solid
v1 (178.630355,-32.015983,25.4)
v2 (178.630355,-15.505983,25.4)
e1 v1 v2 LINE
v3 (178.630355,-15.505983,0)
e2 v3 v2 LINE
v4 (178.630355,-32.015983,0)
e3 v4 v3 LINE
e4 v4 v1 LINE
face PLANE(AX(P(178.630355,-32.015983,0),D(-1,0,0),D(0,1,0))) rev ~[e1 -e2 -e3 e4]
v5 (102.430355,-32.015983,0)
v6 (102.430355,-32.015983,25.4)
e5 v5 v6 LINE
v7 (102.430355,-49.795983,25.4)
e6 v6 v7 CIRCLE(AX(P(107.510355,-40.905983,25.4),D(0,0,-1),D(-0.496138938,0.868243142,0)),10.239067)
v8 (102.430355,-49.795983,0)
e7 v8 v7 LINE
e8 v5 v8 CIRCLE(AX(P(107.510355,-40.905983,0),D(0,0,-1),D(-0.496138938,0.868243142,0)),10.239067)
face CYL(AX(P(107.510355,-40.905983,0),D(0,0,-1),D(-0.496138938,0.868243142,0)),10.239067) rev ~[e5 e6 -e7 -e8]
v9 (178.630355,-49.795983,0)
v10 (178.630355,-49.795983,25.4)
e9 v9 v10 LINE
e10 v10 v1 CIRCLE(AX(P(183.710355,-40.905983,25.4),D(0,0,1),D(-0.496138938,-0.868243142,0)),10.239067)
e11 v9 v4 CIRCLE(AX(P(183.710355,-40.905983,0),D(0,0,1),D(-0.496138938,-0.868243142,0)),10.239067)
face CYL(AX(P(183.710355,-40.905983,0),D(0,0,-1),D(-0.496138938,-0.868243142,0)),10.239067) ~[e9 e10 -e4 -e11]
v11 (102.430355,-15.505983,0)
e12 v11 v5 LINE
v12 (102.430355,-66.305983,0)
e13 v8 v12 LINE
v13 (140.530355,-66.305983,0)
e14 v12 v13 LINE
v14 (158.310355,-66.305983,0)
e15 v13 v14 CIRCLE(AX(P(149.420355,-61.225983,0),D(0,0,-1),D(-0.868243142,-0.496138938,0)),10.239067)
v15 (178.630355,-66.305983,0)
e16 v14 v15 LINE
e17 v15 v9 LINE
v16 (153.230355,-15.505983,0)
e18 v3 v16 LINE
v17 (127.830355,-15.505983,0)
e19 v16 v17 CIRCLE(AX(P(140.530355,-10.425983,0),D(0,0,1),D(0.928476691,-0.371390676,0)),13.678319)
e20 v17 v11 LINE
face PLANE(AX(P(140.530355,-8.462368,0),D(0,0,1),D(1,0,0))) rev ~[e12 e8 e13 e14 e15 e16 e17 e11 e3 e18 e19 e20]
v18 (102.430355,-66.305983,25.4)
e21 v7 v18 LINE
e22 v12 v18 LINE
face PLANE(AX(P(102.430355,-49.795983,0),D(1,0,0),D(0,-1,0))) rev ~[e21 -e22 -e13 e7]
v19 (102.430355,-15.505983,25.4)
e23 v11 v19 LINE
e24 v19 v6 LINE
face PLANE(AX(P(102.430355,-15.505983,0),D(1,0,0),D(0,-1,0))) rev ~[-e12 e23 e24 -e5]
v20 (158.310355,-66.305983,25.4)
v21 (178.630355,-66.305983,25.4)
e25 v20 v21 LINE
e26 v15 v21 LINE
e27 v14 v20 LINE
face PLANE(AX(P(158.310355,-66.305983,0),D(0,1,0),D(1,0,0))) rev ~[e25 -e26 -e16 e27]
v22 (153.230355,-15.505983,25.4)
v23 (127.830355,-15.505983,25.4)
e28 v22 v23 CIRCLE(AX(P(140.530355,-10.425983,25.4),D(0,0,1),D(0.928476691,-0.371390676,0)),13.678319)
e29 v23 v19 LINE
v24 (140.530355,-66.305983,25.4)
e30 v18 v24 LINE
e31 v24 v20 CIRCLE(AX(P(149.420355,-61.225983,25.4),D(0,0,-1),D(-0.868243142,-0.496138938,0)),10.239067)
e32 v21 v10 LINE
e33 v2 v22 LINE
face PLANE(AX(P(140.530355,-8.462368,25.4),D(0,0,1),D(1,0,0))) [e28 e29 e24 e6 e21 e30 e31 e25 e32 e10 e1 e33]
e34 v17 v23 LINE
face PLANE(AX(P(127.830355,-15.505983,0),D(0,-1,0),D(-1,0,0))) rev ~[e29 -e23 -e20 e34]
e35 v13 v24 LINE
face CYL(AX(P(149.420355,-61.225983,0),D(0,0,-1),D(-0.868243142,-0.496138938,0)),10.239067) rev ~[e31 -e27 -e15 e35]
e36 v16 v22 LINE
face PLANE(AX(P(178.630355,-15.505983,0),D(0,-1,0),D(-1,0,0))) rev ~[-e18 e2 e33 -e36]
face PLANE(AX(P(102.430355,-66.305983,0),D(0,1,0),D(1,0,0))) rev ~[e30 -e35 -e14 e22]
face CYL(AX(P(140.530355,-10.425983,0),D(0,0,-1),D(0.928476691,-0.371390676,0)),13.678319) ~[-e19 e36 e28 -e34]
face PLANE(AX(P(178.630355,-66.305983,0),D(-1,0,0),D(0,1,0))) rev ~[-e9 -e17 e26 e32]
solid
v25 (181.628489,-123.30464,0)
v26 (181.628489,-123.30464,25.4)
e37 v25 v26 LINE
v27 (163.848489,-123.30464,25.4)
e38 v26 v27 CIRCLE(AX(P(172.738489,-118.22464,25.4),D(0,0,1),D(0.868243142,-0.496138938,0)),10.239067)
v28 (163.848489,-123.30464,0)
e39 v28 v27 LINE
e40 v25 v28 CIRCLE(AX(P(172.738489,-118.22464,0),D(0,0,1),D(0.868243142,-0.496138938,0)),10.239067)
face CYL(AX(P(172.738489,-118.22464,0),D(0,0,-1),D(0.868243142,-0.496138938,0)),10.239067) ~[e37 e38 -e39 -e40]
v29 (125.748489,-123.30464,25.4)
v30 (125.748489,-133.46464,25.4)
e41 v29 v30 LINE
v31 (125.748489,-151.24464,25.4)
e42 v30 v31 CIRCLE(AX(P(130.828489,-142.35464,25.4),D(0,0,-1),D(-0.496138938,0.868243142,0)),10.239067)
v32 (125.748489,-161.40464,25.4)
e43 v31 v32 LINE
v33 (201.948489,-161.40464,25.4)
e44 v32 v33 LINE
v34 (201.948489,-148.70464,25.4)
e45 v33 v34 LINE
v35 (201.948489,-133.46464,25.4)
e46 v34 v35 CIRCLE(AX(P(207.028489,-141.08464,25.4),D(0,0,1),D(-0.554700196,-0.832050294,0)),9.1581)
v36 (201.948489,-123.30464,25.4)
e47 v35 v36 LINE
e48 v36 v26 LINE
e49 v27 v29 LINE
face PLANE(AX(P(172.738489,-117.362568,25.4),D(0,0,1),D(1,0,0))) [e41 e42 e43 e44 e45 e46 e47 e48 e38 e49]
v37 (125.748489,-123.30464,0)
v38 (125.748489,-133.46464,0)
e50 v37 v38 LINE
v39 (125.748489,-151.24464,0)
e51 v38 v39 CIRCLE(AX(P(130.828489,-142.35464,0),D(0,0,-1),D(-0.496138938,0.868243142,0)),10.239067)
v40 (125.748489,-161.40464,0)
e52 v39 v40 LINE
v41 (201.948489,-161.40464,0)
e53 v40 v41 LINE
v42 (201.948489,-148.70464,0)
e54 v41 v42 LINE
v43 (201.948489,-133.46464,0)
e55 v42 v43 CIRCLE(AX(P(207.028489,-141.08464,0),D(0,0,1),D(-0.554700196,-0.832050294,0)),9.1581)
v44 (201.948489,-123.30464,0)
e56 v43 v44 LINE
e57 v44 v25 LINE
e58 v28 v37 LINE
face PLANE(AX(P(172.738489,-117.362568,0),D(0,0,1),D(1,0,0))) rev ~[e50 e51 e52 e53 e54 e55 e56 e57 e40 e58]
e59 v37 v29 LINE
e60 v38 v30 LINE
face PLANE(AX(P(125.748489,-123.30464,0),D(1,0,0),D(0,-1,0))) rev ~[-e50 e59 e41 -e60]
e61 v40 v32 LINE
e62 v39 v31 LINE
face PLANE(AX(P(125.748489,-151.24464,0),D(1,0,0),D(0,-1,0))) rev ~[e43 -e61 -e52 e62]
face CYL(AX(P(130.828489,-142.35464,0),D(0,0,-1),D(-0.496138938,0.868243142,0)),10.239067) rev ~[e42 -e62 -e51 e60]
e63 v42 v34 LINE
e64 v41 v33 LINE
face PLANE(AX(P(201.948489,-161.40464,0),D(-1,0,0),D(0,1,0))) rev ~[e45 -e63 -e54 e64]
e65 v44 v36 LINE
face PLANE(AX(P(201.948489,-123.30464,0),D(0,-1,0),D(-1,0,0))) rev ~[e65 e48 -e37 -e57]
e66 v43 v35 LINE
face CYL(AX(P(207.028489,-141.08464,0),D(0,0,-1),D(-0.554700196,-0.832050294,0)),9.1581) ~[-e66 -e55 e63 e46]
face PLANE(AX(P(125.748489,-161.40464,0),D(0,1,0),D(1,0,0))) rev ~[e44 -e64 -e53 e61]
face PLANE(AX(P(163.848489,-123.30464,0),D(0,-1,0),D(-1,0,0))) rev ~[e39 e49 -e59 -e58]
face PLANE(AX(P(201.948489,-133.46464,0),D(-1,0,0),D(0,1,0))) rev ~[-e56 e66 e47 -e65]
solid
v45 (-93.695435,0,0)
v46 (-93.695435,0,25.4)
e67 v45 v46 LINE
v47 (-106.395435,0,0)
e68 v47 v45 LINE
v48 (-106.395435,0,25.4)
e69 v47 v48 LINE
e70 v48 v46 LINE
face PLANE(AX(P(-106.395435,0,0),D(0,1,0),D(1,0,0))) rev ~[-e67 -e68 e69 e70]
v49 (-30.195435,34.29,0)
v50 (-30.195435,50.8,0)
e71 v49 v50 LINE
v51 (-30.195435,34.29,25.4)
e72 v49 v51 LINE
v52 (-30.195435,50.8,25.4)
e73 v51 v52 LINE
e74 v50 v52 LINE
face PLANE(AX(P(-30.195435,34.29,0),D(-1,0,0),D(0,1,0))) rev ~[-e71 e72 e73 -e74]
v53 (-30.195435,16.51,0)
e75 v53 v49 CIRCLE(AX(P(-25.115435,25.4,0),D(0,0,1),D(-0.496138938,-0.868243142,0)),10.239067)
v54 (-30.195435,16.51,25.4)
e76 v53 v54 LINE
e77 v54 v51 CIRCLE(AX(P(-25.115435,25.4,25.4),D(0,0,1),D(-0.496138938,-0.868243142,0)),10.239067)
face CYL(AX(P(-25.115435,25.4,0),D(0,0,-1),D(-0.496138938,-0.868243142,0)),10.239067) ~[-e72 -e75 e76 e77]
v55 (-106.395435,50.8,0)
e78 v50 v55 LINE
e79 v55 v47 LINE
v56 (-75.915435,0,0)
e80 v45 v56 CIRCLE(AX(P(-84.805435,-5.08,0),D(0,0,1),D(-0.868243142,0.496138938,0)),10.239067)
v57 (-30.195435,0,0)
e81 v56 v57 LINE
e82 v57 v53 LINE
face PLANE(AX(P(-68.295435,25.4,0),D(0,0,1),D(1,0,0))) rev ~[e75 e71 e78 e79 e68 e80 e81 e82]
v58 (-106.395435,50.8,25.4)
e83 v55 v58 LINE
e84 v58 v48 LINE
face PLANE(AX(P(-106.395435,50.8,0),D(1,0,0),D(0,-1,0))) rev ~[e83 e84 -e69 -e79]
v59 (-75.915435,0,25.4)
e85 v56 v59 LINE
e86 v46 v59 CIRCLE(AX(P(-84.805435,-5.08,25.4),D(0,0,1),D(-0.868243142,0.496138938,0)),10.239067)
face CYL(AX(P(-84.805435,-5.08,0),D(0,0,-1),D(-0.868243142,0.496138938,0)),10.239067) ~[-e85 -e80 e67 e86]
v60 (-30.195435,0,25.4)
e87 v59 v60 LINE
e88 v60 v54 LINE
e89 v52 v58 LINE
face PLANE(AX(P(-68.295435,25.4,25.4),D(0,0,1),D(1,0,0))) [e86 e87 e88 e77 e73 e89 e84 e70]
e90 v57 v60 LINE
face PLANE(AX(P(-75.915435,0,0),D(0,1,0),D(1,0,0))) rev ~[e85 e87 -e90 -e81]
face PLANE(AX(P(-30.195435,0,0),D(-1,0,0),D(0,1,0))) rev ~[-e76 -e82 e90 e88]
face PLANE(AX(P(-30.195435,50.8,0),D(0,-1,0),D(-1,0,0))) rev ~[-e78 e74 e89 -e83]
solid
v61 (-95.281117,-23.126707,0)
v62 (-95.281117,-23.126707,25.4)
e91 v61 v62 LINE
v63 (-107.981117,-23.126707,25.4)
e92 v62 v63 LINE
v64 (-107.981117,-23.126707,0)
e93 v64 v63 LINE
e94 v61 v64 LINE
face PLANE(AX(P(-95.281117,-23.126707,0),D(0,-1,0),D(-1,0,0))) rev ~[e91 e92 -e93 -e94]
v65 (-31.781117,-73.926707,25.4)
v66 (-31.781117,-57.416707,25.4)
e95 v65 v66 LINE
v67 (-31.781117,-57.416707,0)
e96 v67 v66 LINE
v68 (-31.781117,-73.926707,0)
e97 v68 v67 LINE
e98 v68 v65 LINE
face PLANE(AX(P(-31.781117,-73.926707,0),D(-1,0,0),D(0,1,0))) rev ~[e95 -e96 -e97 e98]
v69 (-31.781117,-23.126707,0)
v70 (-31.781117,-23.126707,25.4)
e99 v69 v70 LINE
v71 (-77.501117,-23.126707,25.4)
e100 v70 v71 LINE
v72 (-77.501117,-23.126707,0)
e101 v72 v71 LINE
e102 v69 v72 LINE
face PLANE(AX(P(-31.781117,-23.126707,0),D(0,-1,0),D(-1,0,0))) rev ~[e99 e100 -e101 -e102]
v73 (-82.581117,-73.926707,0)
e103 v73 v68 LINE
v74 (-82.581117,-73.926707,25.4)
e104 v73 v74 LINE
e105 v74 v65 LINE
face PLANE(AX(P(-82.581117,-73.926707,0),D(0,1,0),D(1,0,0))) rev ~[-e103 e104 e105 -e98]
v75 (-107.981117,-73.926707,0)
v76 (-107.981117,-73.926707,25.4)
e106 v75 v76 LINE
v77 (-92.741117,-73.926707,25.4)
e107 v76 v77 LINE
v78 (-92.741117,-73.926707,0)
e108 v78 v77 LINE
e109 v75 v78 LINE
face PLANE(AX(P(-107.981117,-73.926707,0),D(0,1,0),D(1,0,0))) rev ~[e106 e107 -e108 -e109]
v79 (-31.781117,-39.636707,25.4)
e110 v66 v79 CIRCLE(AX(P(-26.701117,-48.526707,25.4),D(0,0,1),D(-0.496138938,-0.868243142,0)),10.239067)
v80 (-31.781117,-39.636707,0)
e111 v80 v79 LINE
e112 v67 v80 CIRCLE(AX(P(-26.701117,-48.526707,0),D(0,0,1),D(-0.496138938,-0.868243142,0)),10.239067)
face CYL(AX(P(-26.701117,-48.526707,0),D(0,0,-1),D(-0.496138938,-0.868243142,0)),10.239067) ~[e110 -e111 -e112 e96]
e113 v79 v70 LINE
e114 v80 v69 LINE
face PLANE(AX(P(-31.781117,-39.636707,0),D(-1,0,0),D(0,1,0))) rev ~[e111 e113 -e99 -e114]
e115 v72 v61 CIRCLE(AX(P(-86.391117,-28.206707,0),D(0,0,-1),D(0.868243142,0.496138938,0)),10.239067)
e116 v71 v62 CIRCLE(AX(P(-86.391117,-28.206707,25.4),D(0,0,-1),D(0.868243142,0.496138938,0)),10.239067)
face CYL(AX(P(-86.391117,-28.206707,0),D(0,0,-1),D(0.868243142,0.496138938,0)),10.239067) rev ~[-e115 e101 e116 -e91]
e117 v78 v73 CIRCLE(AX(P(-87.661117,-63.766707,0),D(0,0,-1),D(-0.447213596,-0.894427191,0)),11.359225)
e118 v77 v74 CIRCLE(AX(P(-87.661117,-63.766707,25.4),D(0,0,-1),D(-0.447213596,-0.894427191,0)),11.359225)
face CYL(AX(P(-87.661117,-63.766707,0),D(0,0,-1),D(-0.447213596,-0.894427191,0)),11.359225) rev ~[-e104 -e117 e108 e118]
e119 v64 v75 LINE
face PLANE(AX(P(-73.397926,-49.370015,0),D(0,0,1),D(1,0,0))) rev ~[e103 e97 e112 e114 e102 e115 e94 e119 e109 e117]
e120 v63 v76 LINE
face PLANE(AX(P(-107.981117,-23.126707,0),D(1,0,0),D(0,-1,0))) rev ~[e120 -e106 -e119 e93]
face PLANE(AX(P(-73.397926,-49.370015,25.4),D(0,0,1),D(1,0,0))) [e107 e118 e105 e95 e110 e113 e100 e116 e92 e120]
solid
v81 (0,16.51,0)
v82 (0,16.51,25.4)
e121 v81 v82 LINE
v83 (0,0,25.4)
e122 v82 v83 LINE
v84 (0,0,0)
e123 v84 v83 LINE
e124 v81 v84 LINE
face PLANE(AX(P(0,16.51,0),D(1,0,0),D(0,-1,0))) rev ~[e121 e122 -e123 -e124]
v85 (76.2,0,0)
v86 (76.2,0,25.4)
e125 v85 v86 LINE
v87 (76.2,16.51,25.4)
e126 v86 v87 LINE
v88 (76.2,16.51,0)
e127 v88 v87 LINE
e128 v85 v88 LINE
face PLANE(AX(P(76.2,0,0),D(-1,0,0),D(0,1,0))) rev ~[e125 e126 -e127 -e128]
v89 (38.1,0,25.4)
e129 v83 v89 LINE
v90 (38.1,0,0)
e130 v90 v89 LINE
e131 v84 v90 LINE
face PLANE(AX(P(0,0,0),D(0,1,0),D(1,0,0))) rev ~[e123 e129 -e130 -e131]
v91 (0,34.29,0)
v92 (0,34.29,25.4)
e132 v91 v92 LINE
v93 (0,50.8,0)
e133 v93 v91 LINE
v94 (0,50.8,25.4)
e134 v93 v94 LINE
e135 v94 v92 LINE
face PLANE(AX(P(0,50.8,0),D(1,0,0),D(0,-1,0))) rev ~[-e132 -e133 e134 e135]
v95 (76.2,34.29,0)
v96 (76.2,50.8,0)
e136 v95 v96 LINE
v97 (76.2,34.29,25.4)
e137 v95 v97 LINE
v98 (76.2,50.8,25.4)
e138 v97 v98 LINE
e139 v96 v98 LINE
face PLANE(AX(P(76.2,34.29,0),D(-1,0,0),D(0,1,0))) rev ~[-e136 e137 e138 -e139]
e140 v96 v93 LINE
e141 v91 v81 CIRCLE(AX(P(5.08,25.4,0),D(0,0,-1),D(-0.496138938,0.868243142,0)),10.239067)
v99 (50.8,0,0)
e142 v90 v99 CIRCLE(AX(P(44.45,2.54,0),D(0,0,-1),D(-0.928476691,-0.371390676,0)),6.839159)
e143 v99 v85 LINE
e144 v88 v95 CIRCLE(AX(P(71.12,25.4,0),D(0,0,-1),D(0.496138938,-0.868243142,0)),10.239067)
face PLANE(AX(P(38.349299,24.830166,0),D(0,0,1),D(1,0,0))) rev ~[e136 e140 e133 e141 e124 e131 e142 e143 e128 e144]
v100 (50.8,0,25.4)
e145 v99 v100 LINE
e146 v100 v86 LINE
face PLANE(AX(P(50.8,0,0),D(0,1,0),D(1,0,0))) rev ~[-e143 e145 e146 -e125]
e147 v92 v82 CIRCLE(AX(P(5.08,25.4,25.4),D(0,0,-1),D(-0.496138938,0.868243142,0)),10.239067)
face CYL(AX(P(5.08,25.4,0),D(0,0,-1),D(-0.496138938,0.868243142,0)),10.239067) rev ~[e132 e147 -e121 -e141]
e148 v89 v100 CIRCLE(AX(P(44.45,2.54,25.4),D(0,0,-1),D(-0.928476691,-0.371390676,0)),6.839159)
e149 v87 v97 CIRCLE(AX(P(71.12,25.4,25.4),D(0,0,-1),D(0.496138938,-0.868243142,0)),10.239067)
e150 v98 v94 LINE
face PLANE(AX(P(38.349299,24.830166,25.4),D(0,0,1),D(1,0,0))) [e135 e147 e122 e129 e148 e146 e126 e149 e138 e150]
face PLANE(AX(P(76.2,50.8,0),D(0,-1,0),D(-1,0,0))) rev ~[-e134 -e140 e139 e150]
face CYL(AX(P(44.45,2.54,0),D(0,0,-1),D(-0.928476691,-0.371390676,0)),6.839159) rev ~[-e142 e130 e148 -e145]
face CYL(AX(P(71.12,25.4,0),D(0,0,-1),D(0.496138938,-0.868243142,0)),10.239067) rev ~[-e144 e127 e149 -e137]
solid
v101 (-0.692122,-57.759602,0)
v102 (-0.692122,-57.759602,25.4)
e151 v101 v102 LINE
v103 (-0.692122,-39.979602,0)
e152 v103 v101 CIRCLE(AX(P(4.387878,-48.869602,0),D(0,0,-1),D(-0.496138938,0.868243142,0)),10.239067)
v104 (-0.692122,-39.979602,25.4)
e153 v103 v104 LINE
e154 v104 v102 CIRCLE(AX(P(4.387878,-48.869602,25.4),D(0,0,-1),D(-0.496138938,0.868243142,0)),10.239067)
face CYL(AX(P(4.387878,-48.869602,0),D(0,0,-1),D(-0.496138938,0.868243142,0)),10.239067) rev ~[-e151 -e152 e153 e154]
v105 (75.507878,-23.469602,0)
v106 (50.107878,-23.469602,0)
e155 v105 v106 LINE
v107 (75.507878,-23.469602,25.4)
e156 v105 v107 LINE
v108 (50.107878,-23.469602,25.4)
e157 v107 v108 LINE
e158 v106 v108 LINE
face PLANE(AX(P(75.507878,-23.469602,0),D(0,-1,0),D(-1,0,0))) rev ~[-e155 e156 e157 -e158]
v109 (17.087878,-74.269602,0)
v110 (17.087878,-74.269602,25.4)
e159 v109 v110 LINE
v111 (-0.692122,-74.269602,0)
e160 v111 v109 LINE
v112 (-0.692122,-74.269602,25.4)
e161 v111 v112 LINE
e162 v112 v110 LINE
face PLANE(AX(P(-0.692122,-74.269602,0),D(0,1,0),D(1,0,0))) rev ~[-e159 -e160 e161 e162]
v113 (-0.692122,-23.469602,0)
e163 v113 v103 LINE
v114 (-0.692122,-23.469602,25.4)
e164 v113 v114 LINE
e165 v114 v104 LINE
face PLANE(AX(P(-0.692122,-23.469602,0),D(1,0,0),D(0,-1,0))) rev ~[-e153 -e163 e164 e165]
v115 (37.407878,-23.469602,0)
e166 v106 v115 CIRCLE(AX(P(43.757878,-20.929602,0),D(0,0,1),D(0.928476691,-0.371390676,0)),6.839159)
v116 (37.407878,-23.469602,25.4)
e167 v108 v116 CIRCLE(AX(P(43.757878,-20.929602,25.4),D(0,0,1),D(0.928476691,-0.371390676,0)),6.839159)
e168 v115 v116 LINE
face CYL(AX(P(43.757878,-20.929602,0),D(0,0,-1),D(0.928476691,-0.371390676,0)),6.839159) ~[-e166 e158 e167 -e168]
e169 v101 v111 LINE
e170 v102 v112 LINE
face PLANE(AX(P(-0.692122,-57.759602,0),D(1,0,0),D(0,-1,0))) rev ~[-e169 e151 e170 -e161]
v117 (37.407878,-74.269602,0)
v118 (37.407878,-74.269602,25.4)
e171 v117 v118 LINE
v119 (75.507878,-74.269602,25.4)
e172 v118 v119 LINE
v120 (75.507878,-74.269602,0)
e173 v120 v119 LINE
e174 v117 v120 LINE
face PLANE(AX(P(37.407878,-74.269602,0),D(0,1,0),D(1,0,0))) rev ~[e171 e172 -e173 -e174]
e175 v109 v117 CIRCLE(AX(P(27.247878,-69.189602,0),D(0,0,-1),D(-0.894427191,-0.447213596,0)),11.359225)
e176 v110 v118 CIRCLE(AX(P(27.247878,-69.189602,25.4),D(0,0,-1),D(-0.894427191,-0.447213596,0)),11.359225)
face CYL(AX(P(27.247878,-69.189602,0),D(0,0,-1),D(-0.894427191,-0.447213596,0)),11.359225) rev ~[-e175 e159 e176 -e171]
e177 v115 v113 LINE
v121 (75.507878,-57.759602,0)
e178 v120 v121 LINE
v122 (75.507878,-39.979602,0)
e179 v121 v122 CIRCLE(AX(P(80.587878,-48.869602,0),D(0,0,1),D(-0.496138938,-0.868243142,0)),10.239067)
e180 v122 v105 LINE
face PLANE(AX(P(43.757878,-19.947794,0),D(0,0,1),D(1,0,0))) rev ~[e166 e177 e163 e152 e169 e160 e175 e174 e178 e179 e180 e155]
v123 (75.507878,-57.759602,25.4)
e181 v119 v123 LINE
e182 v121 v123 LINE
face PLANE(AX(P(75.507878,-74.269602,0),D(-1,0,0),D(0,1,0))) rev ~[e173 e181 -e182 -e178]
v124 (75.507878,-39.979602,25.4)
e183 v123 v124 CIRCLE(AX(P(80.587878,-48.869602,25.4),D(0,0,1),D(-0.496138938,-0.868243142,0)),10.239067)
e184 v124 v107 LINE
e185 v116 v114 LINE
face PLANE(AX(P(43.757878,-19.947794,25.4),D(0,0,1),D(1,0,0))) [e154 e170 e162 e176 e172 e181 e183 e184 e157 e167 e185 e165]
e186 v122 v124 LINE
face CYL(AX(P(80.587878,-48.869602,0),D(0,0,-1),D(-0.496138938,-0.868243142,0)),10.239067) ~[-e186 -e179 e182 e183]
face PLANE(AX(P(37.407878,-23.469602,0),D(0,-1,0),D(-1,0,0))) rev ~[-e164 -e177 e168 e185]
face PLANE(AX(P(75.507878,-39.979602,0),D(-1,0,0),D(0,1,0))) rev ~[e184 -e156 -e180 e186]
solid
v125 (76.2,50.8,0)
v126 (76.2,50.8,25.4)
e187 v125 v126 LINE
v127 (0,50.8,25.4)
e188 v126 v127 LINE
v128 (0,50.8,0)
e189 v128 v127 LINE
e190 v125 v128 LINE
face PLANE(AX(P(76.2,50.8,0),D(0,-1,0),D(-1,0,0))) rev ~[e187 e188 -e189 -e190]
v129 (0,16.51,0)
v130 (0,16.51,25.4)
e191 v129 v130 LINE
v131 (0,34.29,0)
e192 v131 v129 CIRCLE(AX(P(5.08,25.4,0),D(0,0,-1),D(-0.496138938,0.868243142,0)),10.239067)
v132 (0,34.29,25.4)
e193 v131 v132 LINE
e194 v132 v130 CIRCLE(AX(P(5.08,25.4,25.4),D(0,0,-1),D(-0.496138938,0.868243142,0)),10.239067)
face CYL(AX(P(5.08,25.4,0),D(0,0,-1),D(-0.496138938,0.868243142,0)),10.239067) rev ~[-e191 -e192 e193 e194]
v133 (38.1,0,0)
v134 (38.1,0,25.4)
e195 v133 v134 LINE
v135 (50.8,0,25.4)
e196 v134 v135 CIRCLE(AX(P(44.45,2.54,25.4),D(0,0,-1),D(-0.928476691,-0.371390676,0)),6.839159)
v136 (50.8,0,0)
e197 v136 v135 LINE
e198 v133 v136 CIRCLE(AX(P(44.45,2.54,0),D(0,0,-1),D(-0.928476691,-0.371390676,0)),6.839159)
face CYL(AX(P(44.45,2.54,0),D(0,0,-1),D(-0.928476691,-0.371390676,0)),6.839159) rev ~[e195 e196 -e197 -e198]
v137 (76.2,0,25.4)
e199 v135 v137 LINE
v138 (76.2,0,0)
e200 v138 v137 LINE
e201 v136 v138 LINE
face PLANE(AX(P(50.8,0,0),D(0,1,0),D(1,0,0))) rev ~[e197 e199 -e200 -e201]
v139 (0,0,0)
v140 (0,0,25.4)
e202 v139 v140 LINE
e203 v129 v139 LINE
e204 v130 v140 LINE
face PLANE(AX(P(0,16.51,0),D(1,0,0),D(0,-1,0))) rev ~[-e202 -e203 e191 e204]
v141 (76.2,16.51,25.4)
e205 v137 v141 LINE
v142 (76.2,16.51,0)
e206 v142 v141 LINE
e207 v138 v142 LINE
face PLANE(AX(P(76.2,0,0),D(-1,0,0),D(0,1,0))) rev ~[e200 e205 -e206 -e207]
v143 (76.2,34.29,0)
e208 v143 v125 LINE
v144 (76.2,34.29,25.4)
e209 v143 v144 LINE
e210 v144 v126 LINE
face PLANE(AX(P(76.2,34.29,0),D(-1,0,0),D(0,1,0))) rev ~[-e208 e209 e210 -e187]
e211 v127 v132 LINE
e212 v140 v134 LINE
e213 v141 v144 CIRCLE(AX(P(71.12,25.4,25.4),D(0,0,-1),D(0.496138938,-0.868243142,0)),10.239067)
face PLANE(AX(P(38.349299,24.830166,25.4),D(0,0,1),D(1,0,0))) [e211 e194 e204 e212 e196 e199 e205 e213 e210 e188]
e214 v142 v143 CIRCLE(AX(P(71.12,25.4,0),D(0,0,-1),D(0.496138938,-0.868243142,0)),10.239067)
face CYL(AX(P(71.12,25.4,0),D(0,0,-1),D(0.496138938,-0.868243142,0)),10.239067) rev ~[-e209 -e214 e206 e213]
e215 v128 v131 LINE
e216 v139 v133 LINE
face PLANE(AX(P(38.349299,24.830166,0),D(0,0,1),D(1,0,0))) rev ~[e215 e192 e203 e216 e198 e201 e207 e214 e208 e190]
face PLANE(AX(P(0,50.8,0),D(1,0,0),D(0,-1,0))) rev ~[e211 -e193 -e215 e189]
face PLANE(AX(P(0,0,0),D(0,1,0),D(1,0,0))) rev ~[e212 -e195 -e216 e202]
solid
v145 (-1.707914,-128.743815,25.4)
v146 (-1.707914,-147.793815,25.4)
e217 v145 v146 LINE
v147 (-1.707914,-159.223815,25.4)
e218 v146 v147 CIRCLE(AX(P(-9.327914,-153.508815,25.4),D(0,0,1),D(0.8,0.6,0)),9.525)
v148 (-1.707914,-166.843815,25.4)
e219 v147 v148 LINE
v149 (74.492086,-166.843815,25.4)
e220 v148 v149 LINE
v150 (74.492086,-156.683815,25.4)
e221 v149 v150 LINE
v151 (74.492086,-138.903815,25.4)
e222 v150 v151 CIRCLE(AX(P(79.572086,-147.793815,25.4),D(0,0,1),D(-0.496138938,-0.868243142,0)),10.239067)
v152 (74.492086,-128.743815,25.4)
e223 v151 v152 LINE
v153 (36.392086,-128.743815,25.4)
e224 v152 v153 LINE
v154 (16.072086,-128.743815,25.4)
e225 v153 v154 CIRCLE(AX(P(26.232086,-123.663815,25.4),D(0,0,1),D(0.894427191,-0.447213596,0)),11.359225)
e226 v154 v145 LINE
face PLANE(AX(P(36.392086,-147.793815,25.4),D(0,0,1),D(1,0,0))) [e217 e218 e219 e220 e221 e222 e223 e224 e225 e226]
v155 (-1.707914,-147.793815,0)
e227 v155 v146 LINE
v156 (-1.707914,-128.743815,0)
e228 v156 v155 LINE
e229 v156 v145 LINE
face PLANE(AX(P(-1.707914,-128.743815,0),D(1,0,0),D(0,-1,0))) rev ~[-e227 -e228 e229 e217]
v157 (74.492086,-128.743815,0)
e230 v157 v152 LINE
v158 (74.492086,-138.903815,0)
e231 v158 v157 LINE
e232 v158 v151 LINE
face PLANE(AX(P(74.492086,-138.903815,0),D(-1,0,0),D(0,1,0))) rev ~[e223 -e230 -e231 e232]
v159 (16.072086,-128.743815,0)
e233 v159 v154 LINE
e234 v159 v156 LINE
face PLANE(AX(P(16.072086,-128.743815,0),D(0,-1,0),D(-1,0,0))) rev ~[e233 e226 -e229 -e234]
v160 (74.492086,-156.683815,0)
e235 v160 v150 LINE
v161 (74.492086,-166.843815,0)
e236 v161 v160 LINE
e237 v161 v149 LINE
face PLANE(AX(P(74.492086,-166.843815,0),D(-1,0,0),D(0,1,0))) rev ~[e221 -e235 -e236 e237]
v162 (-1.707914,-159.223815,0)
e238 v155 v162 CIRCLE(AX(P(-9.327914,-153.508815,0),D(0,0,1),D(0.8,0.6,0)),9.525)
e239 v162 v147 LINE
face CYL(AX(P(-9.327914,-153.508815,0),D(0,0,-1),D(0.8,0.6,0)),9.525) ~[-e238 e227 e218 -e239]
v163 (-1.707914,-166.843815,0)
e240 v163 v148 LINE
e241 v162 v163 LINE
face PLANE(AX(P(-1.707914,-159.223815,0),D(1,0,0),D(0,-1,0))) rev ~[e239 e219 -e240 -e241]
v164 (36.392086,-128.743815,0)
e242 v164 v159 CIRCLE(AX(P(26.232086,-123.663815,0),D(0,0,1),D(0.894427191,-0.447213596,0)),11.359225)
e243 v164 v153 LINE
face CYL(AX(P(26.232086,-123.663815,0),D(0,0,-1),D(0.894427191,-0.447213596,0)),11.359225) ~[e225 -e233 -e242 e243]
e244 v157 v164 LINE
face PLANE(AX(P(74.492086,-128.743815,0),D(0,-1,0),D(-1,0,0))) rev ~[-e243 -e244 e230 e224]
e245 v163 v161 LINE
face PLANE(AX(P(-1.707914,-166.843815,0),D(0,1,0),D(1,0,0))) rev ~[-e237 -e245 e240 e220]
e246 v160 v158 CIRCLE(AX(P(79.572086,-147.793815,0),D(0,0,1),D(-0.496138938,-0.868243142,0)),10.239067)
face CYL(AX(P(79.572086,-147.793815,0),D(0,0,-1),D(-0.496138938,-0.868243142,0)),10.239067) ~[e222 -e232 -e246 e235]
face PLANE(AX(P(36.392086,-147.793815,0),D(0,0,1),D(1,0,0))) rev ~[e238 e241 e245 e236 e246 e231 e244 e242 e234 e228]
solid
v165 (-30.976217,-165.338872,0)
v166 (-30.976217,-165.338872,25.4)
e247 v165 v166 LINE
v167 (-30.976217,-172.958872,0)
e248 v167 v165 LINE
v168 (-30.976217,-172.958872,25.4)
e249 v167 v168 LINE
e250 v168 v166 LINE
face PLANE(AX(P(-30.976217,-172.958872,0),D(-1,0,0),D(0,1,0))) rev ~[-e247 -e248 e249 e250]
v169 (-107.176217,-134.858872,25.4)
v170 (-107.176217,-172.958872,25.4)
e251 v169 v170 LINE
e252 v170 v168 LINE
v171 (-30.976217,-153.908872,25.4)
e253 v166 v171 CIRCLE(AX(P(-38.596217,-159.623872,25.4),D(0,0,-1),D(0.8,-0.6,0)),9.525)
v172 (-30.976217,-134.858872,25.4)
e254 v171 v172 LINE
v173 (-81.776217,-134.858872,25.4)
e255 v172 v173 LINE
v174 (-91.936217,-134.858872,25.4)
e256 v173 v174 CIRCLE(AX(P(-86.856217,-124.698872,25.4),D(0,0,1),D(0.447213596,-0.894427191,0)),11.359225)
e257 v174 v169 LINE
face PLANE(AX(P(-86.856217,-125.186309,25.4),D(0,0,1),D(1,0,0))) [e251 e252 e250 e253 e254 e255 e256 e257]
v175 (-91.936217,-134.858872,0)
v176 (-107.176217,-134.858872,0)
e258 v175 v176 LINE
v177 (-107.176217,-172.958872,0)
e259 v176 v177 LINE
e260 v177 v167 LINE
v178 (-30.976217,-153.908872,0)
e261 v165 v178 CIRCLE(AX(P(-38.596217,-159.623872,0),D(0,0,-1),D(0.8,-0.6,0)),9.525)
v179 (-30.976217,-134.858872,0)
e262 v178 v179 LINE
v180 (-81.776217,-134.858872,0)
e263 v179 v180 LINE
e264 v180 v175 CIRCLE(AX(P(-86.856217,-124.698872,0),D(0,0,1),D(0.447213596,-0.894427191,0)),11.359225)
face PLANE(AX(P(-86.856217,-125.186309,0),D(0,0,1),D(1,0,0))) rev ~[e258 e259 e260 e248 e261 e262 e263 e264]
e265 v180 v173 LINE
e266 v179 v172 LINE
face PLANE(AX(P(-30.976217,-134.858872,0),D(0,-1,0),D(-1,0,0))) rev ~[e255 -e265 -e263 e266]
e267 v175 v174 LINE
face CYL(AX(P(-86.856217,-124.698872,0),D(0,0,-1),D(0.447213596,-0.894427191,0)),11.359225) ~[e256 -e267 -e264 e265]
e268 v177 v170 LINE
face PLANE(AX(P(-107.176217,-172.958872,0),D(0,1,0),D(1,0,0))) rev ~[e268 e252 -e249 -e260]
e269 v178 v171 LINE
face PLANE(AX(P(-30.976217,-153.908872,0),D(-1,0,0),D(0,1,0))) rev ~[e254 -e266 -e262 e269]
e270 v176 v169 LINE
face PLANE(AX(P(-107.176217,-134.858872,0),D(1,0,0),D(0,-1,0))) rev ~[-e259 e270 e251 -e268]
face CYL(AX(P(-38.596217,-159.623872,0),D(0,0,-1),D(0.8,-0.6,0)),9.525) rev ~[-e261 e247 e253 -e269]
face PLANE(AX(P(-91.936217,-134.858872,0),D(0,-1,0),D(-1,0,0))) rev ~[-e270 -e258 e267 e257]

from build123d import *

# Parameters (mm, degrees)
F1_DEPTH  = 25.4
F3_DEPTH  = 25.4
F5_DEPTH  = 25.4
F7_DEPTH  = 25.4
F8_DEPTH  = 25.4
F10_DEPTH = 25.4
F12_DEPTH = 25.4
F14_DEPTH = 25.4
F16_DEPTH = 25.4


# Not quite as in the source:
# - a feature names something its author has since deleted; it is built from what else it names


with BuildPart() as f1:
    # F0 (on Top) → F1 (new body)
    with BuildSketch(Plane.XY):
        with BuildLine():
            Line((0, 16.51), (0, 0))
            Line((0, 0), (38.1, 0))
            ThreePointArc((38.1, 0), (44.45, 9.3791593051), (50.8, 0))
            Line((50.8, 0), (76.2, 0))
            Line((76.2, 0), (76.2, 16.51))
            ThreePointArc((76.2, 16.51), (60.8809326597, 25.4), (76.2, 34.29))
            Line((76.2, 34.29), (76.2, 50.8))
            Line((76.2, 50.8), (0, 50.8))
            Line((0, 50.8), (0, 34.29))
            ThreePointArc((0, 34.29), (15.3190673403, 25.4), (0, 16.51))
        make_face()
    extrude(amount=F1_DEPTH)


with BuildPart() as f3:
    # F2 (on Top) → F3 (new body)
    with BuildSketch(Plane.XY):
        Polygon((-30.1954353519, 34.29), (-30.1954353519, 50.8), (-106.3954353519, 50.8), (-106.3954353519, 0), (-93.6954353519, 0), (-75.9154353519, 0), (-30.1954353519, 0), (-30.1954353519, 16.51), align=None)
        with BuildLine():
            ThreePointArc((-30.1954353519, 16.51), (-14.8763680116, 25.4), (-30.1954353519, 34.29))
            Line((-30.1954353519, 34.29), (-30.1954353519, 16.51))
        make_face()
        with BuildLine():
            Line((-75.9154353519, 0), (-93.6954353519, 0))
            ThreePointArc((-93.6954353519, 0), (-84.8054353519, -15.3190673403), (-75.9154353519, 0))
        make_face()
    extrude(amount=F3_DEPTH)


with BuildPart() as f5:
    # F4 (on Top) → F5 (new body)
    with BuildSketch(Plane.XY):
        with BuildLine():
            Line((-31.7811166644, -39.6367072773), (-31.7811166644, -23.1267072773))
            Line((-31.7811166644, -23.1267072773), (-77.5011166644, -23.1267072773))
            ThreePointArc((-77.5011166644, -23.1267072773), (-86.3911166644, -38.4457746176), (-95.2811166644, -23.1267072773))
            Line((-95.2811166644, -23.1267072773), (-107.9811166644, -23.1267072773))
            Line((-107.9811166644, -23.1267072773), (-107.9811166644, -73.9267072773))
            Line((-107.9811166644, -73.9267072773), (-92.7411166644, -73.9267072773))
            ThreePointArc((-92.7411166644, -73.9267072773), (-87.6611166644, -52.4074819516), (-82.5811166644, -73.9267072773))
            Line((-82.5811166644, -73.9267072773), (-31.7811166644, -73.9267072773))
            Line((-31.7811166644, -73.9267072773), (-31.7811166644, -57.4167072773))
            Line((-31.7811166644, -57.4167072773), (-31.7811166644, -39.6367072773))
        make_face()
        with BuildLine():
            ThreePointArc((-31.7811166644, -57.4167072773), (-16.4620493241, -48.5267072773), (-31.7811166644, -39.6367072773))
            Line((-31.7811166644, -39.6367072773), (-31.7811166644, -57.4167072773))
        make_face()
    extrude(amount=F5_DEPTH)


with BuildPart() as f7:
    # F6 (on Top) → F7 (new body)
    with BuildSketch(Plane.XY):
        with BuildLine():
            ThreePointArc((50.1078782513, -23.4696016228), (43.7578782513, -14.0904423178), (37.4078782513, -23.4696016228))
            Line((37.4078782513, -23.4696016228), (50.1078782513, -23.4696016228))
        make_face()
        with BuildLine():
            ThreePointArc((75.5078782513, -57.7596016228), (90.8269455917, -48.8696016228), (75.5078782513, -39.9796016228))
            Line((75.5078782513, -39.9796016228), (75.5078782513, -57.7596016228))
        make_face()
        with BuildLine():
            Line((37.4078782513, -23.4696016228), (-0.6921217487, -23.4696016228))
            Line((-0.6921217487, -23.4696016228), (-0.6921217487, -39.9796016228))
            ThreePointArc((-0.6921217487, -39.9796016228), (14.6269455917, -48.8696016228), (-0.6921217487, -57.7596016228))
            Line((-0.6921217487, -57.7596016228), (-0.6921217487, -74.2696016228))
            Line((-0.6921217487, -74.2696016228), (17.0878782513, -74.2696016228))
            ThreePointArc((17.0878782513, -74.2696016228), (27.2478782513, -57.8303762971), (37.4078782513, -74.2696016228))
            Line((37.4078782513, -74.2696016228), (75.5078782513, -74.2696016228))
            Line((75.5078782513, -74.2696016228), (75.5078782513, -57.7596016228))
            Line((75.5078782513, -57.7596016228), (75.5078782513, -39.9796016228))
            Line((75.5078782513, -39.9796016228), (75.5078782513, -23.4696016228))
            Line((75.5078782513, -23.4696016228), (50.1078782513, -23.4696016228))
            Line((50.1078782513, -23.4696016228), (37.4078782513, -23.4696016228))
        make_face()
    extrude(amount=F7_DEPTH)


with BuildPart() as f8:
    # F0 (on Top) → F8 (new body)
    with BuildSketch(Plane.XY):
        with BuildLine():
            Line((0, 16.51), (0, 0))
            Line((0, 0), (38.1, 0))
            ThreePointArc((38.1, 0), (44.45, 9.3791593051), (50.8, 0))
            Line((50.8, 0), (76.2, 0))
            Line((76.2, 0), (76.2, 16.51))
            ThreePointArc((76.2, 16.51), (60.8809326597, 25.4), (76.2, 34.29))
            Line((76.2, 34.29), (76.2, 50.8))
            Line((76.2, 50.8), (0, 50.8))
            Line((0, 50.8), (0, 34.29))
            ThreePointArc((0, 34.29), (15.3190673403, 25.4), (0, 16.51))
        make_face()
    extrude(amount=F8_DEPTH)


with BuildPart() as f10:
    # F9 (on Top) → F10 (new body)
    with BuildSketch(Plane.XY):
        with BuildLine():
            ThreePointArc((153.2303552747, -15.5059827256), (140.5303552747, 3.2523358845), (127.8303552747, -15.5059827256))
            Line((127.8303552747, -15.5059827256), (153.2303552747, -15.5059827256))
        make_face()
        with BuildLine():
            ThreePointArc((178.6303552747, -49.7959827256), (193.949422615, -40.9059827256), (178.6303552747, -32.0159827256))
            Line((178.6303552747, -32.0159827256), (178.6303552747, -49.7959827256))
        make_face()
        with BuildLine():
            Line((127.8303552747, -15.5059827256), (102.4303552747, -15.5059827256))
            Line((102.4303552747, -15.5059827256), (102.4303552747, -32.0159827256))
            ThreePointArc((102.4303552747, -32.0159827256), (117.749422615, -40.9059827256), (102.4303552747, -49.7959827256))
            Line((102.4303552747, -49.7959827256), (102.4303552747, -66.3059827256))
            Line((102.4303552747, -66.3059827256), (140.5303552747, -66.3059827256))
            ThreePointArc((140.5303552747, -66.3059827256), (149.4203552747, -50.9869153853), (158.3103552747, -66.3059827256))
            Line((158.3103552747, -66.3059827256), (178.6303552747, -66.3059827256))
            Line((178.6303552747, -66.3059827256), (178.6303552747, -49.7959827256))
            Line((178.6303552747, -49.7959827256), (178.6303552747, -32.0159827256))
            Line((178.6303552747, -32.0159827256), (178.6303552747, -15.5059827256))
            Line((178.6303552747, -15.5059827256), (153.2303552747, -15.5059827256))
            Line((153.2303552747, -15.5059827256), (127.8303552747, -15.5059827256))
        make_face()
    extrude(amount=F10_DEPTH)


with BuildPart() as f12:
    # F11 (on Top) → F12 (new body)
    with BuildSketch(Plane.XY):
        with BuildLine():
            ThreePointArc((-81.7762166262, -134.8588719903), (-86.8562166262, -113.3396466646), (-91.9362166262, -134.8588719903))
            Line((-91.9362166262, -134.8588719903), (-81.7762166262, -134.8588719903))
        make_face()
        with BuildLine():
            Line((-91.9362166262, -134.8588719903), (-107.1762166262, -134.8588719903))
            Line((-107.1762166262, -134.8588719903), (-107.1762166262, -172.9588719903))
            Line((-107.1762166262, -172.9588719903), (-30.9762166262, -172.9588719903))
            Line((-30.9762166262, -172.9588719903), (-30.9762166262, -165.3388719903))
            ThreePointArc((-30.9762166262, -165.3388719903), (-48.1212166262, -159.6238719903), (-30.9762166262, -153.9088719903))
            Line((-30.9762166262, -153.9088719903), (-30.9762166262, -134.8588719903))
            Line((-30.9762166262, -134.8588719903), (-81.7762166262, -134.8588719903))
            Line((-81.7762166262, -134.8588719903), (-91.9362166262, -134.8588719903))
        make_face()
    extrude(amount=F12_DEPTH)


with BuildPart() as f14:
    # F13 (on Top) → F14 (new body)
    with BuildSketch(Plane.XY):
        Polygon((16.0720860608, -128.7438145399), (-1.7079139392, -128.7438145399), (-1.7079139392, -147.7938145399), (-1.7079139392, -159.2238145399), (-1.7079139392, -166.8438145399), (74.4920860608, -166.8438145399), (74.4920860608, -156.6838145399), (74.4920860608, -138.9038145399), (74.4920860608, -128.7438145399), (36.3920860608, -128.7438145399), align=None)
        with BuildLine():
            ThreePointArc((36.3920860608, -128.7438145399), (26.2320860608, -112.3045892142), (16.0720860608, -128.7438145399))
            Line((16.0720860608, -128.7438145399), (36.3920860608, -128.7438145399))
        make_face()
        with BuildLine():
            Line((-1.7079139392, -159.2238145399), (-1.7079139392, -147.7938145399))
            ThreePointArc((-1.7079139392, -147.7938145399), (-18.8529139392, -153.5088145399), (-1.7079139392, -159.2238145399))
        make_face()
        with BuildLine():
            ThreePointArc((74.4920860608, -156.6838145399), (89.8111534011, -147.7938145399), (74.4920860608, -138.9038145399))
            Line((74.4920860608, -138.9038145399), (74.4920860608, -156.6838145399))
        make_face()
    extrude(amount=F14_DEPTH)


with BuildPart() as f16:
    # F15 (on Top) → F16 (new body)
    with BuildSketch(Plane.XY):
        with BuildLine():
            ThreePointArc((181.6284889733, -123.3046403503), (172.7384889733, -107.98557301), (163.8484889733, -123.3046403503))
            Line((163.8484889733, -123.3046403503), (181.6284889733, -123.3046403503))
        make_face()
        with BuildLine():
            Line((163.8484889733, -123.3046403503), (125.7484889733, -123.3046403503))
            Line((125.7484889733, -123.3046403503), (125.7484889733, -133.4646403503))
            ThreePointArc((125.7484889733, -133.4646403503), (141.0675563136, -142.3546403503), (125.7484889733, -151.2446403503))
            Line((125.7484889733, -151.2446403503), (125.7484889733, -161.4046403503))
            Line((125.7484889733, -161.4046403503), (201.9484889733, -161.4046403503))
            Line((201.9484889733, -161.4046403503), (201.9484889733, -148.7046403503))
            Line((201.9484889733, -148.7046403503), (201.9484889733, -133.4646403503))
            Line((201.9484889733, -133.4646403503), (201.9484889733, -123.3046403503))
            Line((201.9484889733, -123.3046403503), (181.6284889733, -123.3046403503))
            Line((181.6284889733, -123.3046403503), (163.8484889733, -123.3046403503))
        make_face()
        with BuildLine():
            ThreePointArc((201.9484889733, -148.7046403503), (216.186589213, -141.0846403503), (201.9484889733, -133.4646403503))
            Line((201.9484889733, -133.4646403503), (201.9484889733, -148.7046403503))
        make_face()
    extrude(amount=F16_DEPTH)


solid = Compound([f1.part, f3.part, f5.part, f7.part, f8.part, f10.part, f12.part, f14.part, f16.part])
